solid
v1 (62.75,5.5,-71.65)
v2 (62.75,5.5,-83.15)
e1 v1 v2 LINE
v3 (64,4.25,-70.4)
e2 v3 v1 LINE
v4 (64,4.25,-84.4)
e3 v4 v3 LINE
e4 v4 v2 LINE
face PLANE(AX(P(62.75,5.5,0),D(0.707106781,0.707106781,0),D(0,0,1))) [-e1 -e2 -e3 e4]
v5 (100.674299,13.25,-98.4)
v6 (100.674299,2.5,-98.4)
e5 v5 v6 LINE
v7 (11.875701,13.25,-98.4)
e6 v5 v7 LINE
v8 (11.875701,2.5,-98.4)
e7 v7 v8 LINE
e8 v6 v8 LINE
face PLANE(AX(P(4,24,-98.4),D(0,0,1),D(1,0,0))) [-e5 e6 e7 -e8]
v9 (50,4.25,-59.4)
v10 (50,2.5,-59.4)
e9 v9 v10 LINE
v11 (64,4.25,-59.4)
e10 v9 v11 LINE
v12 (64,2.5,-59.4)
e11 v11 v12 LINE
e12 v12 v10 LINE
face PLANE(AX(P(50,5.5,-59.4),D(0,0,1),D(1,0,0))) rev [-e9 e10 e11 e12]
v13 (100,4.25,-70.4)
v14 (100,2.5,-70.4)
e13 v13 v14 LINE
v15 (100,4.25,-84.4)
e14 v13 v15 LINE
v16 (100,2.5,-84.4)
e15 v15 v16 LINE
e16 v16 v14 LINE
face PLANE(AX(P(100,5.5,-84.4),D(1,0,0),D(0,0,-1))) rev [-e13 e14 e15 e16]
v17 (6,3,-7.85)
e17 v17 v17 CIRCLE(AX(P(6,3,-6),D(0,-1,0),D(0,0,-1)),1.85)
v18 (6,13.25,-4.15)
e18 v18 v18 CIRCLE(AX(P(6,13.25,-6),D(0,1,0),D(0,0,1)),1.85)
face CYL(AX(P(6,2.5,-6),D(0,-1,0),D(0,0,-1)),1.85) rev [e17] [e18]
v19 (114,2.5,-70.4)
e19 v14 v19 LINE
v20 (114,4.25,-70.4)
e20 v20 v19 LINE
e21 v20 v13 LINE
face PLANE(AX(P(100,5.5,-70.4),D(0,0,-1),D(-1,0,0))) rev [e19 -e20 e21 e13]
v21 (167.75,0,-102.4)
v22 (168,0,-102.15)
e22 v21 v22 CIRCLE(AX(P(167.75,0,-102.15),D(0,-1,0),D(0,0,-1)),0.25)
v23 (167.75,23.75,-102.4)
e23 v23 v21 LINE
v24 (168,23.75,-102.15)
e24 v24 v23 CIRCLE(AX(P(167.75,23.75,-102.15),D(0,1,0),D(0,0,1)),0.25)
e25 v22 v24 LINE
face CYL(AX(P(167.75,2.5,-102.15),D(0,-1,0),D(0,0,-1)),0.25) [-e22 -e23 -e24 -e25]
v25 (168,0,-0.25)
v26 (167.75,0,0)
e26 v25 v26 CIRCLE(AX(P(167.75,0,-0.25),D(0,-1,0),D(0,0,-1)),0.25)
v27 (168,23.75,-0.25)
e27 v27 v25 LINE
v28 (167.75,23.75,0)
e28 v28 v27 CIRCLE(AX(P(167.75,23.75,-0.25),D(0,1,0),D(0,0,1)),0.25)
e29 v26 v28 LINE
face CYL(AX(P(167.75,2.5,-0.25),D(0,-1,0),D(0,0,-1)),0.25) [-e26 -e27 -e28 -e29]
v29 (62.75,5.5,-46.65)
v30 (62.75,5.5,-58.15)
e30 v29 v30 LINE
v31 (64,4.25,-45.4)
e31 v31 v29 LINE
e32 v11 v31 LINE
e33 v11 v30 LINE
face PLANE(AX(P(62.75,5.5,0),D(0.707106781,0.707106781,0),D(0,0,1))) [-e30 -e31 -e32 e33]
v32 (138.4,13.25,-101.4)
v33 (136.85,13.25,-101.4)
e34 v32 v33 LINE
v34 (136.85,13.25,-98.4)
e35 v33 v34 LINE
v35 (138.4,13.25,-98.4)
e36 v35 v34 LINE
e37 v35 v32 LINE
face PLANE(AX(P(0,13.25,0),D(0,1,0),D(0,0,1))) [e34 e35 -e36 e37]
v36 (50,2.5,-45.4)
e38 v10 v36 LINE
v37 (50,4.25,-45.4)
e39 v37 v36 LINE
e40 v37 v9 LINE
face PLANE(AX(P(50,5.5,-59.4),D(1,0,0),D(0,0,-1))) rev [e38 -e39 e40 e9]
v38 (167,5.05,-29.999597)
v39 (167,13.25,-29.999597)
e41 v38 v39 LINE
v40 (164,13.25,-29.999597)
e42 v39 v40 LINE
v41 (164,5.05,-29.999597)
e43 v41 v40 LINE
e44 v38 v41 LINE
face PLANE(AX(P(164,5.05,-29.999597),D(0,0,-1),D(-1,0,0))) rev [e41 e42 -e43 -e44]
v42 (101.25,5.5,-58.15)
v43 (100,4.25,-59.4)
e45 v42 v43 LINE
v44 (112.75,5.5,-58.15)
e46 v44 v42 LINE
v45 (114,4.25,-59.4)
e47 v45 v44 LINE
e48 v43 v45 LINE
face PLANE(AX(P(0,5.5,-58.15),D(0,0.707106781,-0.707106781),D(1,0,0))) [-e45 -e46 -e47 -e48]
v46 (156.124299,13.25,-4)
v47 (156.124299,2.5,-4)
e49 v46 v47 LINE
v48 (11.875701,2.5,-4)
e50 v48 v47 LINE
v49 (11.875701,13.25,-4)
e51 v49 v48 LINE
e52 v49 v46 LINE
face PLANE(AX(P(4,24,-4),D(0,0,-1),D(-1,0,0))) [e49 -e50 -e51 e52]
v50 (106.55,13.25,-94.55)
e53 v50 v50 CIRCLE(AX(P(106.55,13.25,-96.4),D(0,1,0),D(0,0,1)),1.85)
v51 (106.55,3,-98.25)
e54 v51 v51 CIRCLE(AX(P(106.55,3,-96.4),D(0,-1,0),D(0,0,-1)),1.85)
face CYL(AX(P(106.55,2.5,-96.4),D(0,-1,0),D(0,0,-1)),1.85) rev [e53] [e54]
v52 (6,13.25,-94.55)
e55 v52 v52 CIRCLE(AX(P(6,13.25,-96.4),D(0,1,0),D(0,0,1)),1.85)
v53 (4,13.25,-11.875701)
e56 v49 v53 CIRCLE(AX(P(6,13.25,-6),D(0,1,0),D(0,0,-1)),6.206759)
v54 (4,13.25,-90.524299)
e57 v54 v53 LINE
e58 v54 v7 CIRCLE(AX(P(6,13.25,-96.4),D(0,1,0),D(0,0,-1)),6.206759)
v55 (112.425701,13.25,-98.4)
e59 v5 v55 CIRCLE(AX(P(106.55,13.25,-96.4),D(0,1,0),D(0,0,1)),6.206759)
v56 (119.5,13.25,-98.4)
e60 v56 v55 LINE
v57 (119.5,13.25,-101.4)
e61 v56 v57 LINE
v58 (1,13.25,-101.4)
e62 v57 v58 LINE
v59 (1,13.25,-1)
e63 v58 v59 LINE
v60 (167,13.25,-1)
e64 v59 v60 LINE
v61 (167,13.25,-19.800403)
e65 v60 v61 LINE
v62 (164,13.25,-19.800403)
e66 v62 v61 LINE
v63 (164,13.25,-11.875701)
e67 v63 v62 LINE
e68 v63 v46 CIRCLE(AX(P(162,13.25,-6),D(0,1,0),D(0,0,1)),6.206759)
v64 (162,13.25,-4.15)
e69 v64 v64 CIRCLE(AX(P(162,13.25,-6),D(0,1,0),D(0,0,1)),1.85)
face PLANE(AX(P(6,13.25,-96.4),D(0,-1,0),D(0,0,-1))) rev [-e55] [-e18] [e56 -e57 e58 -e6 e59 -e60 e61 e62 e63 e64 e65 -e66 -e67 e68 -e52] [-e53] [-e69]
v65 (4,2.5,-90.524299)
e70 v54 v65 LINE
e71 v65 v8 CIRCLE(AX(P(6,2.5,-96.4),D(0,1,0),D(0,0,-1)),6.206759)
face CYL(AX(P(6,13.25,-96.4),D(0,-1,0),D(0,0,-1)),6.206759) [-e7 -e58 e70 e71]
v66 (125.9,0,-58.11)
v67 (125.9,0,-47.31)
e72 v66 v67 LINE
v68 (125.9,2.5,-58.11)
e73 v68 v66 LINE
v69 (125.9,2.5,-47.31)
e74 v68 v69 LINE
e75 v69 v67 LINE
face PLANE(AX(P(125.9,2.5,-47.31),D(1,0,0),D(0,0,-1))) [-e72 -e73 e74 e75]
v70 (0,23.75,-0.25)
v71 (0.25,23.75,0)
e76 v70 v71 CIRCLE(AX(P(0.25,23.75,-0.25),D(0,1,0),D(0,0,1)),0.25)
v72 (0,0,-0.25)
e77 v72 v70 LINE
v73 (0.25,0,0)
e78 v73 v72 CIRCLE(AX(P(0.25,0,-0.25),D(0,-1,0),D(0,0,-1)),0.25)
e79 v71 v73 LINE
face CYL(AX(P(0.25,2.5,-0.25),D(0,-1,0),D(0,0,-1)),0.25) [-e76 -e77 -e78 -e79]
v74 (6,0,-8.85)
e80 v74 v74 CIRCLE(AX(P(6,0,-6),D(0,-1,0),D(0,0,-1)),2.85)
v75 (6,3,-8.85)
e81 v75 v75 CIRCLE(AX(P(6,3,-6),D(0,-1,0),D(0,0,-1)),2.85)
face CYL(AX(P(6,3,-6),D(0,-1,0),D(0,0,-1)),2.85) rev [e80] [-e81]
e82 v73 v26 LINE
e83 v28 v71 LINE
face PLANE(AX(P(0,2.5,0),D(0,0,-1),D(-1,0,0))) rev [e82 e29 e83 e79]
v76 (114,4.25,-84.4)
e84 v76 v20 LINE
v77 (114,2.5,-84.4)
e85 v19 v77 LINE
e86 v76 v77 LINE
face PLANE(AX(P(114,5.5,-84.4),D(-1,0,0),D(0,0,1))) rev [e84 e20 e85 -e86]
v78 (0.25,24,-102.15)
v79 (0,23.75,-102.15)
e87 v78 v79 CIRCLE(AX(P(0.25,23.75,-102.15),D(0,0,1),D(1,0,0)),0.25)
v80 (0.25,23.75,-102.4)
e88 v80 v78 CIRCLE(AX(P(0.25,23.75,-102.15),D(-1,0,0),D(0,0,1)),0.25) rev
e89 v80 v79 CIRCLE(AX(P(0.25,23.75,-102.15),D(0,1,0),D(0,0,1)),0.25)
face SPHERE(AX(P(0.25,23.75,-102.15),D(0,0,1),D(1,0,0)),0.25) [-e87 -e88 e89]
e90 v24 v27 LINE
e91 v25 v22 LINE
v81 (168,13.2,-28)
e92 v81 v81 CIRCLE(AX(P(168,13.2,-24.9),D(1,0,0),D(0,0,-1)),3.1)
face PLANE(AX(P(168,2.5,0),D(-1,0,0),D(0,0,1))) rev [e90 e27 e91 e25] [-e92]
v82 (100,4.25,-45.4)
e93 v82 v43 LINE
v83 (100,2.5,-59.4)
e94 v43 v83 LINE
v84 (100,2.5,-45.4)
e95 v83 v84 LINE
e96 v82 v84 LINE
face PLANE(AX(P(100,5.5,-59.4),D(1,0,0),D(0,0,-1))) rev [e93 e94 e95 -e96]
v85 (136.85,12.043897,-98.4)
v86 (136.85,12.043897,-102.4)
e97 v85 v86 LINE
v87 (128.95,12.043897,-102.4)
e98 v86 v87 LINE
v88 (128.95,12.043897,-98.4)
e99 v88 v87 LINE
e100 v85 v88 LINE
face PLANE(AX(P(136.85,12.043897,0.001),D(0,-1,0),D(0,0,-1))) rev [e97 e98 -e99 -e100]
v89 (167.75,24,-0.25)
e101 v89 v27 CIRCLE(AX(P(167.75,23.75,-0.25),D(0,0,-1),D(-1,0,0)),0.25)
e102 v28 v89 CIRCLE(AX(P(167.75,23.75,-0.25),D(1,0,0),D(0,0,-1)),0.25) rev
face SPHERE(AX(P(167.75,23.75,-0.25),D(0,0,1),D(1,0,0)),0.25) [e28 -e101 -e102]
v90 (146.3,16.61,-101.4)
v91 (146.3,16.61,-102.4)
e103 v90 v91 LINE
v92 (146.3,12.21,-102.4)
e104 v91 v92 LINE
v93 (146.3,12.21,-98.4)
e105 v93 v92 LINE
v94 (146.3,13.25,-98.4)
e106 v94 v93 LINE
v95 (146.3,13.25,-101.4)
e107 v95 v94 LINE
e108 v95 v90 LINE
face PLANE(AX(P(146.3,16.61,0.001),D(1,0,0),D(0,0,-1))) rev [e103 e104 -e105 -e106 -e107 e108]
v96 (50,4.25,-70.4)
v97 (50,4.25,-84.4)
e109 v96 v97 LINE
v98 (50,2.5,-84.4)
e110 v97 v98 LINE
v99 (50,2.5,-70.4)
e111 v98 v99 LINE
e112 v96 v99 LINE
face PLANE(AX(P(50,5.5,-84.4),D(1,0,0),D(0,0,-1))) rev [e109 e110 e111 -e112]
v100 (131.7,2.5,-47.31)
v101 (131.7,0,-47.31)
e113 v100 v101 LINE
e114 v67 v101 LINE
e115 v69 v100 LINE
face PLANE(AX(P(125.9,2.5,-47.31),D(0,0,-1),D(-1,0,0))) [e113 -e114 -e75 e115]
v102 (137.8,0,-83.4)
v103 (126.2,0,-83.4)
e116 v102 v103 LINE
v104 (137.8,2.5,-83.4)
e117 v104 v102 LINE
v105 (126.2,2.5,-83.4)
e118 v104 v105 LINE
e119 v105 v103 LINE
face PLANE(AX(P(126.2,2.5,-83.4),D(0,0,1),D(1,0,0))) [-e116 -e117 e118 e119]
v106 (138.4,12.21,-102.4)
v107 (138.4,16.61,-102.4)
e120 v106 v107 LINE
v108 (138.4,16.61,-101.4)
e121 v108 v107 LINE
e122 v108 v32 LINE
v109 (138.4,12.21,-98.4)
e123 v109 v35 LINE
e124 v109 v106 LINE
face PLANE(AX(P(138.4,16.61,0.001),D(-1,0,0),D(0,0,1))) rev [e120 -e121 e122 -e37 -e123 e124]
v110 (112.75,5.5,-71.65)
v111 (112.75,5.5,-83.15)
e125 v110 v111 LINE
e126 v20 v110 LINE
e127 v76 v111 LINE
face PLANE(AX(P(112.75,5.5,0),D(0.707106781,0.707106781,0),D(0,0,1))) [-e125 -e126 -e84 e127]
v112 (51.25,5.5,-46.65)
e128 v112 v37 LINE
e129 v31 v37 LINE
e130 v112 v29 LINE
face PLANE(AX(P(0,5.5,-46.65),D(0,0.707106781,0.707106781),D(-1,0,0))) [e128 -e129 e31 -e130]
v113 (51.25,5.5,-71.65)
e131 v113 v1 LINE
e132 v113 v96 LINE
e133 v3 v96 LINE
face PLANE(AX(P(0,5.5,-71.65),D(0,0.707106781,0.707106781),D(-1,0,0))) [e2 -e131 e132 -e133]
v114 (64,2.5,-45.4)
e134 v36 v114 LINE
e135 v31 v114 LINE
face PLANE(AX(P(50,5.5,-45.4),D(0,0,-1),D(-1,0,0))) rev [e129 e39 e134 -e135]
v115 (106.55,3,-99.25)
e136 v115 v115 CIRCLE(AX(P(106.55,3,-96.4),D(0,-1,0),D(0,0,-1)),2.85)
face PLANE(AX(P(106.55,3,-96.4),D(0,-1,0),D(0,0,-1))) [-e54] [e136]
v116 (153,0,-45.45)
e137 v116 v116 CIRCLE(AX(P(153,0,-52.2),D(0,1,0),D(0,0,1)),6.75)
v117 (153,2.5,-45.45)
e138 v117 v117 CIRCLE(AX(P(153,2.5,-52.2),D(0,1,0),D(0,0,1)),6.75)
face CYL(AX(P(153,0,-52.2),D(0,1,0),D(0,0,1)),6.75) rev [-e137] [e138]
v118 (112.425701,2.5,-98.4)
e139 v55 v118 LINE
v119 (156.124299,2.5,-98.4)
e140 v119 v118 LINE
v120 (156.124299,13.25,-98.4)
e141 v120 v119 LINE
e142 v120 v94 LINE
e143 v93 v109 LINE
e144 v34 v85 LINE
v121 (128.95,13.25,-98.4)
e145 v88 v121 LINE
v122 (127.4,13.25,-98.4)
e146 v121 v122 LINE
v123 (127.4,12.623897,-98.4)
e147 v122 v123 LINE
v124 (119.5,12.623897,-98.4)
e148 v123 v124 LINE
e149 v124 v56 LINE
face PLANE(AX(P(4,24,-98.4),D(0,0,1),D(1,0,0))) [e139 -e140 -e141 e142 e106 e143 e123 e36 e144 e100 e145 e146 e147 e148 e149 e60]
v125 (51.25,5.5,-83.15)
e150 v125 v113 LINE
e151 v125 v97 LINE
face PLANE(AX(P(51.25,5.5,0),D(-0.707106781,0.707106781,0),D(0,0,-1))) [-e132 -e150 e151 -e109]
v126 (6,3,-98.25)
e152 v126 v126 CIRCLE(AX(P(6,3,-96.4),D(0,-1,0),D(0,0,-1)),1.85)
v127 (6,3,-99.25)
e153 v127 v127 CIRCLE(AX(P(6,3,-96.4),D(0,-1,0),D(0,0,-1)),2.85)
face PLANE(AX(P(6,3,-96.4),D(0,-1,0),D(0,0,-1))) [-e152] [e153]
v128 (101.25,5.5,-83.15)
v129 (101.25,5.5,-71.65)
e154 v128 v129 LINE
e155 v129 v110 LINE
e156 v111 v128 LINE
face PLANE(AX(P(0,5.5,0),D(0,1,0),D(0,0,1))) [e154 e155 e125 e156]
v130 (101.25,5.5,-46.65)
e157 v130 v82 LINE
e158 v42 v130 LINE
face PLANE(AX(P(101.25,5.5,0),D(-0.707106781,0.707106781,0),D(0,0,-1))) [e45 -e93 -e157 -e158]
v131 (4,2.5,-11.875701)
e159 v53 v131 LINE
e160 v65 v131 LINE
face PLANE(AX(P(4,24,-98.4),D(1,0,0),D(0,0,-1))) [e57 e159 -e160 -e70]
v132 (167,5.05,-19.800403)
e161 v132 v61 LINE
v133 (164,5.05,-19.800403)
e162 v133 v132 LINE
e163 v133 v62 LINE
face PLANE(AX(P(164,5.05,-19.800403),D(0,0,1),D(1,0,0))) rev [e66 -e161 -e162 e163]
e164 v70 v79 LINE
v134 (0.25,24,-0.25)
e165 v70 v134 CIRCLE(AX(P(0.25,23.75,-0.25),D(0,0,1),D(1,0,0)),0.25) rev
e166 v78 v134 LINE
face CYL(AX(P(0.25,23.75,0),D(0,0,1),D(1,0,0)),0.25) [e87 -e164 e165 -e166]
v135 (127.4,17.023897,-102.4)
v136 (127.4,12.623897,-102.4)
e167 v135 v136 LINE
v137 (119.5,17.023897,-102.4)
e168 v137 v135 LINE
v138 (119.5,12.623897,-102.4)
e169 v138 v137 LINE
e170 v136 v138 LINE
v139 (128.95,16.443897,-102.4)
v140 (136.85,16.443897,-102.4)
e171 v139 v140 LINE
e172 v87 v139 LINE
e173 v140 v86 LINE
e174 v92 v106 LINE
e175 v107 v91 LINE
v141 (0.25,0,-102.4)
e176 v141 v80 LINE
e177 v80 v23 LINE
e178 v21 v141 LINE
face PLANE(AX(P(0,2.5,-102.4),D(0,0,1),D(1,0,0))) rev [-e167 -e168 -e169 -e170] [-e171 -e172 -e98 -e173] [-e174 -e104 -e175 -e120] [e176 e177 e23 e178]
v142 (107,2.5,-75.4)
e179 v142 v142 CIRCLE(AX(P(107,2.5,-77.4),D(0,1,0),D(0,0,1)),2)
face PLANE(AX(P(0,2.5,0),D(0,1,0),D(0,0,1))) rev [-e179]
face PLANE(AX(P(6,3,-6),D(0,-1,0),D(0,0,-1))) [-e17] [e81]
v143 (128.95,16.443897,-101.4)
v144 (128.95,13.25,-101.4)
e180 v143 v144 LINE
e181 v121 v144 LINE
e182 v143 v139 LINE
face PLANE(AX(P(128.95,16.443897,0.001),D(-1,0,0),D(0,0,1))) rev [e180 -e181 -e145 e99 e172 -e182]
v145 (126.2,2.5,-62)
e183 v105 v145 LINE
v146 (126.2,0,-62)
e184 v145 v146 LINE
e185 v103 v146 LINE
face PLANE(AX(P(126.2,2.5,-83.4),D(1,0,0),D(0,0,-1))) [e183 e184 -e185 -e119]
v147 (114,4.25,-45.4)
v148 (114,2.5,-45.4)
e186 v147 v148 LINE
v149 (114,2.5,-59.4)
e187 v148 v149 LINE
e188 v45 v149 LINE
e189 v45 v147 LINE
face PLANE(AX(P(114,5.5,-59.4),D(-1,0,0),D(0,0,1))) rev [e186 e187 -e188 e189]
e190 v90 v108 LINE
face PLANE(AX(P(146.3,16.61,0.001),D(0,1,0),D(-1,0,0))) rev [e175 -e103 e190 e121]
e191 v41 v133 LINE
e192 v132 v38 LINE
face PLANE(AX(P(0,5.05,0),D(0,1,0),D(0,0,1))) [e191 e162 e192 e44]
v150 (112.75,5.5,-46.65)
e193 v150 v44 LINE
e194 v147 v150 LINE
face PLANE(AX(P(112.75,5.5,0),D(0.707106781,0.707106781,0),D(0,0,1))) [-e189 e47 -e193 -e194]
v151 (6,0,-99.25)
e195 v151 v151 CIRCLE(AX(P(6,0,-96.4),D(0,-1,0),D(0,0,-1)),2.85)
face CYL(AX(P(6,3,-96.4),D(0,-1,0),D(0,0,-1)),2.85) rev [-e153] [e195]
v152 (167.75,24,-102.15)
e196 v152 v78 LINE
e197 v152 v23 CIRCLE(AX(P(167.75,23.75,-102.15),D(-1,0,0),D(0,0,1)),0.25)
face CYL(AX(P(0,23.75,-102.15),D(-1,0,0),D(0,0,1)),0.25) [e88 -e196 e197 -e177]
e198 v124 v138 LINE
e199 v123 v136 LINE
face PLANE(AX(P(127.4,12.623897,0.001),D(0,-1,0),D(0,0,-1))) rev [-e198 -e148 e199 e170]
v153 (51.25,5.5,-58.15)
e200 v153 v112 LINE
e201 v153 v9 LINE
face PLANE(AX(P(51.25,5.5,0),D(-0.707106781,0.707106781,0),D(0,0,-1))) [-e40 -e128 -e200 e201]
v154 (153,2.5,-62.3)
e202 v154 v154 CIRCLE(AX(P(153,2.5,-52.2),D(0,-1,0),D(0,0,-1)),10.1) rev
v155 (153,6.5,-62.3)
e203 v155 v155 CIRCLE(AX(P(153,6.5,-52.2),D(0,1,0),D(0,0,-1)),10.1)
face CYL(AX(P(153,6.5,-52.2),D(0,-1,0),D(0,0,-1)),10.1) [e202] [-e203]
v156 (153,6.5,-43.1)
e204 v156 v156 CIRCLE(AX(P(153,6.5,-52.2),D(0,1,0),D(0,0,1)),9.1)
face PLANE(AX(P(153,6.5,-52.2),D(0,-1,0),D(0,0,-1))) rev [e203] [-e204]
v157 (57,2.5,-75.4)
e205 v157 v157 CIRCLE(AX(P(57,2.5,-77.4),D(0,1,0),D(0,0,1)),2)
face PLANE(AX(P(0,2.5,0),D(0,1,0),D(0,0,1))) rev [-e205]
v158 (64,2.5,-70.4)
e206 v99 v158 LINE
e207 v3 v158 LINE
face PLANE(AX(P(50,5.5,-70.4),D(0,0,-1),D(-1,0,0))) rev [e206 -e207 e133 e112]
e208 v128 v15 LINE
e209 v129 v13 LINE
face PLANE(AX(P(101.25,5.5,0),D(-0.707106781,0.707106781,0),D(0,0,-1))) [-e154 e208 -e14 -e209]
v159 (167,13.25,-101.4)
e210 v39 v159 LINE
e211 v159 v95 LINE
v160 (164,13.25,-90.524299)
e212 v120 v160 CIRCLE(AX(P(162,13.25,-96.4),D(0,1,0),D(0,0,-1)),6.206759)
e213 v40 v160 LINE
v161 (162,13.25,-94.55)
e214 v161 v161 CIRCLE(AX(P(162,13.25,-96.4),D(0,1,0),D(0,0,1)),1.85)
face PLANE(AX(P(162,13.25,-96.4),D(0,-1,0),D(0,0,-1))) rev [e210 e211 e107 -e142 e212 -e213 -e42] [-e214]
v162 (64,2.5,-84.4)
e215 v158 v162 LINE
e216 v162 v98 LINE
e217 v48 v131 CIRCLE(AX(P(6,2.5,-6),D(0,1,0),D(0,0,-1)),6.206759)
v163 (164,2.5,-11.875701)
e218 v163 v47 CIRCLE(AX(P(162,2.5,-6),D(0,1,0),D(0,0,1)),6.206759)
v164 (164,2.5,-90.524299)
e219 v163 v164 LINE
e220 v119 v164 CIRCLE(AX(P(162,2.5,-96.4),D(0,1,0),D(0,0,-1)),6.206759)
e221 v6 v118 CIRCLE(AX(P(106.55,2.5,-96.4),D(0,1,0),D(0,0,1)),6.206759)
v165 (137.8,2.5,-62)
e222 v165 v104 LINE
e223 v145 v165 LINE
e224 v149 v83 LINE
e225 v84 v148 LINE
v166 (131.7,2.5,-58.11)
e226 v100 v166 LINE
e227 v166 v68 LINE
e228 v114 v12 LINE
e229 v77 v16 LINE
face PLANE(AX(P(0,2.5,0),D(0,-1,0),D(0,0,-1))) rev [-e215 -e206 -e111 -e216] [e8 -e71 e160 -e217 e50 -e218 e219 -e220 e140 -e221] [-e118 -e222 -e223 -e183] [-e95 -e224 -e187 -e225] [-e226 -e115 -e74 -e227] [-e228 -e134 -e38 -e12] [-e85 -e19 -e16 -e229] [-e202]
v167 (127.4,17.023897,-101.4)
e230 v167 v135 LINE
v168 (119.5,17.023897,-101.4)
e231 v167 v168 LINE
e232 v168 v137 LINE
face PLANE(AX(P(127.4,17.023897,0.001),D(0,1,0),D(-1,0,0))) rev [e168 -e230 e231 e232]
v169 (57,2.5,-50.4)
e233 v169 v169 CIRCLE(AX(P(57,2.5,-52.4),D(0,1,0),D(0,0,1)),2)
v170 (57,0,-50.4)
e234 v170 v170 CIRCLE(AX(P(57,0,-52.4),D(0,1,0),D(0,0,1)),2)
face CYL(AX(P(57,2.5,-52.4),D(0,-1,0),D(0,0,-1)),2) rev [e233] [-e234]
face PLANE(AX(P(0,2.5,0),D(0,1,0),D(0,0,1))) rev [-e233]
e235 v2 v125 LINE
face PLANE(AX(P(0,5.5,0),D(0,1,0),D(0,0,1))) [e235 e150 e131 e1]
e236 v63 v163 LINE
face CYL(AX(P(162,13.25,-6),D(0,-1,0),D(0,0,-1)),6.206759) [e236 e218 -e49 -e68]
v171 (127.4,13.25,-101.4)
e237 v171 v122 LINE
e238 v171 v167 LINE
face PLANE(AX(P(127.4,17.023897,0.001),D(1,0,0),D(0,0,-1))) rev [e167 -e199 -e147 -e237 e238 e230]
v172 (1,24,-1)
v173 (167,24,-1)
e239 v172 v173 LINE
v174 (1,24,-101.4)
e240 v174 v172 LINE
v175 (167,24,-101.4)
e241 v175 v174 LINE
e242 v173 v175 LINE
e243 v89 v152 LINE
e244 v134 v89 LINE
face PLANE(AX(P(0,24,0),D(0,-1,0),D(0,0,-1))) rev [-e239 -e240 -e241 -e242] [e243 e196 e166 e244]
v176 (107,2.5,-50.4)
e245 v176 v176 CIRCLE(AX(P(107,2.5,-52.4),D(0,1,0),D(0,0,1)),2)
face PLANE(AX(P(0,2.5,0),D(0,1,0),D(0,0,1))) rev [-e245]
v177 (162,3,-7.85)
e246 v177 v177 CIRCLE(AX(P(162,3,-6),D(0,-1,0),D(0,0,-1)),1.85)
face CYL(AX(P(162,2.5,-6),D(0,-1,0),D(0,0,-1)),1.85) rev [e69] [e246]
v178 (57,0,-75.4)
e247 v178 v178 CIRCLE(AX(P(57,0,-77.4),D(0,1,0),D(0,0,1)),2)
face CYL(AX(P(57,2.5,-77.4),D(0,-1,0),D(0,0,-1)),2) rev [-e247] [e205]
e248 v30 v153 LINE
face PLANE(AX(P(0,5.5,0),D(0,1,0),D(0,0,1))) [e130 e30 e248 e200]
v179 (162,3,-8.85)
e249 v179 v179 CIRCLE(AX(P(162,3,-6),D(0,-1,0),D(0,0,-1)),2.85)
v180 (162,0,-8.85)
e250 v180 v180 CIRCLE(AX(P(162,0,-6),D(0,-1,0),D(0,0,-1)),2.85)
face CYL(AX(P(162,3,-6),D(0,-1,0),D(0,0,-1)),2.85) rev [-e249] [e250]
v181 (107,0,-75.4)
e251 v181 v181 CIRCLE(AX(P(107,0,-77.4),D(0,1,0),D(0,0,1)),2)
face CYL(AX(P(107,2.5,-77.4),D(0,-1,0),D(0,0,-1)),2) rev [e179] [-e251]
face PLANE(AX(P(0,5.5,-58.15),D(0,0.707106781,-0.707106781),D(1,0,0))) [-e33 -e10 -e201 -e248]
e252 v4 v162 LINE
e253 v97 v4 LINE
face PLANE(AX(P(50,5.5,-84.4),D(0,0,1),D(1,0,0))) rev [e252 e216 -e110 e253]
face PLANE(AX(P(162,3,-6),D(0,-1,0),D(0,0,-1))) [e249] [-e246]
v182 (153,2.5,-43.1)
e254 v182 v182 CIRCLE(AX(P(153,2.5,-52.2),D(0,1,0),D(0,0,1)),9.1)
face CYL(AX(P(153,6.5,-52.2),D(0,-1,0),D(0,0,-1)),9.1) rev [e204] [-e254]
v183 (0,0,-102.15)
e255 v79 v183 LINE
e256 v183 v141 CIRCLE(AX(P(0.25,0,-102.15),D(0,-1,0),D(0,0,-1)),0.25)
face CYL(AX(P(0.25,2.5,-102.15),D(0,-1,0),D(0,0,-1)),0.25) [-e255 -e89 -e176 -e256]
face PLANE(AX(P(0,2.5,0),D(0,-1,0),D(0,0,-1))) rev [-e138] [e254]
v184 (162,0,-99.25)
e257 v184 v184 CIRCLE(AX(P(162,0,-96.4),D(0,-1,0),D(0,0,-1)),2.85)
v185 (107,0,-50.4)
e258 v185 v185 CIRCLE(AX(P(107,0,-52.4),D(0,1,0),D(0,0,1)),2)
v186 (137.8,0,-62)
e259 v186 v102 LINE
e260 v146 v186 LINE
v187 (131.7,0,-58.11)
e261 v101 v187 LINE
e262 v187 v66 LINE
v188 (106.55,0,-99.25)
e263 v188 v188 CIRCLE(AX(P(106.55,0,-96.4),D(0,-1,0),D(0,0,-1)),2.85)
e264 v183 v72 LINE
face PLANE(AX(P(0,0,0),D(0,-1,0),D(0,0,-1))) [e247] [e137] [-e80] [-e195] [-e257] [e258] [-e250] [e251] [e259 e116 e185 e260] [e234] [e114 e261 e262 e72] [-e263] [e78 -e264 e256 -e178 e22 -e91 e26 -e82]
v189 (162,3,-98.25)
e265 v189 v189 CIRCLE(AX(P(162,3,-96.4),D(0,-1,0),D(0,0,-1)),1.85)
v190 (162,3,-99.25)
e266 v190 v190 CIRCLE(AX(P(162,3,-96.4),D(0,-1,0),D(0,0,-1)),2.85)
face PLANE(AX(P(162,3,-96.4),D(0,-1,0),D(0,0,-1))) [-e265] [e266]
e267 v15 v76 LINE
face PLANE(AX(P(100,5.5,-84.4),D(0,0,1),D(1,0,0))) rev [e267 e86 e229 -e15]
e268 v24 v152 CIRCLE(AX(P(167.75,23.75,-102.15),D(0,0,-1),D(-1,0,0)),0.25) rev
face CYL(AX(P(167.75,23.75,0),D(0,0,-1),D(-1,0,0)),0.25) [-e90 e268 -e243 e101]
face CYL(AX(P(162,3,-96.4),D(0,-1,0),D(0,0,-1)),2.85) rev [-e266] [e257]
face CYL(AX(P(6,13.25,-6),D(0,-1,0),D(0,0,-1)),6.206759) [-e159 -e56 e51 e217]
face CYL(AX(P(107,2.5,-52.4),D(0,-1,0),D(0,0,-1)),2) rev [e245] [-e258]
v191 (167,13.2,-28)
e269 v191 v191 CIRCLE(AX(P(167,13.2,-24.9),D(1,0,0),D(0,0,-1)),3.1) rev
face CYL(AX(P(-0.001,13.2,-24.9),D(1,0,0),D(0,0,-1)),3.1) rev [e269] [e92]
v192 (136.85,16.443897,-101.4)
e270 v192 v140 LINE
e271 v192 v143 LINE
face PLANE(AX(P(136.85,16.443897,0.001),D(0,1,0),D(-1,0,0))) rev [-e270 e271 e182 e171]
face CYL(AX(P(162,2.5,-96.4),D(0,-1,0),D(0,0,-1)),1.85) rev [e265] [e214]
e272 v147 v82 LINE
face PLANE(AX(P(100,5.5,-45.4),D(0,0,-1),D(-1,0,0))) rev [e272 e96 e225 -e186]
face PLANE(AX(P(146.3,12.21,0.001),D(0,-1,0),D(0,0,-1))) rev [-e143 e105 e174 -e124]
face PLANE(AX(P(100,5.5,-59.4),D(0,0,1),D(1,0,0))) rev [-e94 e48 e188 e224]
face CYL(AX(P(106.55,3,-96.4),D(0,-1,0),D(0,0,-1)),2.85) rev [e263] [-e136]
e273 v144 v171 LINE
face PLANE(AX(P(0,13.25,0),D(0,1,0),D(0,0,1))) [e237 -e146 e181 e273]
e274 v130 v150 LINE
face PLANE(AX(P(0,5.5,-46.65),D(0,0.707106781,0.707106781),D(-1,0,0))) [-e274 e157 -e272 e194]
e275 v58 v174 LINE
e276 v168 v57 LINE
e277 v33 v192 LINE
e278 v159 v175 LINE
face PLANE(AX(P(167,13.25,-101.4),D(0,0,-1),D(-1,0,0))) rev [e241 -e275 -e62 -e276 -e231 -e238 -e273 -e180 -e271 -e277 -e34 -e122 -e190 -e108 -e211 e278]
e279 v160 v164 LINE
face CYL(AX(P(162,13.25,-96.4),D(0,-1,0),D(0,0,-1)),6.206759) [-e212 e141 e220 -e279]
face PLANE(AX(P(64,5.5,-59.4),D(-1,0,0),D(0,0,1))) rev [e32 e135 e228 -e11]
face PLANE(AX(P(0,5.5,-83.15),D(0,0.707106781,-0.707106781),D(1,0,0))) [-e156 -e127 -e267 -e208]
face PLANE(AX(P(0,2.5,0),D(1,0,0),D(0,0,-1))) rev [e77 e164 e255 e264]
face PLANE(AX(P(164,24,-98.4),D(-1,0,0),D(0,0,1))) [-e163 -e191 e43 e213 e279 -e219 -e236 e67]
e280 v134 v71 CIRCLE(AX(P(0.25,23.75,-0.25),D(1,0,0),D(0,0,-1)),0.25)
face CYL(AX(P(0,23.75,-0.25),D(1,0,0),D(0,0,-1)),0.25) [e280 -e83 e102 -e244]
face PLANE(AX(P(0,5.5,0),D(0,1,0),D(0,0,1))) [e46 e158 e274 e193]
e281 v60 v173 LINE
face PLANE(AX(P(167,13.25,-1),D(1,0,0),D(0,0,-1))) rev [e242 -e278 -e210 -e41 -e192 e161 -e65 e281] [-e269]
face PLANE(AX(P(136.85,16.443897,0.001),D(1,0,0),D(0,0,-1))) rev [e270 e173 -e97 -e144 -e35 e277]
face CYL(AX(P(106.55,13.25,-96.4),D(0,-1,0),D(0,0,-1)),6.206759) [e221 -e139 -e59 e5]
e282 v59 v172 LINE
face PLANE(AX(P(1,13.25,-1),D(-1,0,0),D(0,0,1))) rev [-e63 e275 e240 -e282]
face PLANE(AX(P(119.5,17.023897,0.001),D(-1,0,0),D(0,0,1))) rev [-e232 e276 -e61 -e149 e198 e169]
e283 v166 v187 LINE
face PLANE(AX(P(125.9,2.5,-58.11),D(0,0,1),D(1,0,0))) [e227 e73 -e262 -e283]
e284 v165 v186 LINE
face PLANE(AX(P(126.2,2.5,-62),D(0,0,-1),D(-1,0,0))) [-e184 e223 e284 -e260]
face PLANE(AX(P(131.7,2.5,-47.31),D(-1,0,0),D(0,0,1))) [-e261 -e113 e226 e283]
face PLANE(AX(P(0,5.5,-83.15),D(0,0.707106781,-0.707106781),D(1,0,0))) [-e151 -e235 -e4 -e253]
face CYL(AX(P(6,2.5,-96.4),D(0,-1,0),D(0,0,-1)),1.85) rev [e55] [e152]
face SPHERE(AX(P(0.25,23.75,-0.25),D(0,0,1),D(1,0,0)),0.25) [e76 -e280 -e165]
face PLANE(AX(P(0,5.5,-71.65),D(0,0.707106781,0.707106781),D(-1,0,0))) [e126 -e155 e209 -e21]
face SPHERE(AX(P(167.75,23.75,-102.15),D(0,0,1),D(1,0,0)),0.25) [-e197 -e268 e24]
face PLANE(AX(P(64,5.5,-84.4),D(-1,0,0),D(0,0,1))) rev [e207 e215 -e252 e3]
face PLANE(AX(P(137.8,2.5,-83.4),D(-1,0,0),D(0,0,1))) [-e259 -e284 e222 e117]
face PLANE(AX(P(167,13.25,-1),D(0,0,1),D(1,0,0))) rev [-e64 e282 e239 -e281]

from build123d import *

# Parameters (mm, degrees)
BASESKETCH1_W                               = 168
BASESKETCH1_H                               = 102.4
BASESKETCH1_R                               = 2
BASESKETCH1_R_2                             = 1.85
BASESKETCH1_W_2                             = 11.6
BASESKETCH1_H_2                             = 21.4
BASESKETCH1_W_3                             = 5.8
BASESKETCH1_H_3                             = 10.8
BASEBOSS_EXTRUDE1_DEPTH                     = 2.5
SKETCH2_W                                   = 168
SKETCH2_H                                   = 102.4
SKETCH2_W_2                                 = 160
SKETCH2_H_2                                 = 94.4
WALLBOSS_EXTRUDE2_DEPTH                     = 21.5
SKETCH3_W                                   = 14
SKETCH3_H                                   = 14
MOUNTHOLEBOSS_EXTRUDE3_DEPTH                = 3
MOUNTHOLEBOSSCHAMFER3_SIZE                  = 1.25
HDMI7MOUNTHOLESSKETCH8_R                    = 1.85
HDMI7MOUNTHOLESBOSS_EXTRUDE4_DEPTH          = 10.75
DISPLAYBUTTONSCUT_EXTRUDE1_REACH            = 200.206
DISPLAYBUTTONSSKETCH9_W                     = 7.9
DISPLAYBUTTONSSKETCH9_H                     = 4.4
AUDIOCONNECTORCUT_EXTRUDE2_REACH            = 200.206
AUDIOCONNECTORSKETCH10_R                    = 3.1
M3BORESKETCH11_R                            = 2.85
M3BORECUT_EXTRUDE3_DEPTH                    = 3
UPPERTHINWALLSKETCH4_W                      = 166
UPPERTHINWALLSKETCH4_H                      = 100.4
UPPERTHINWALLSKETCH4_W_2                    = 160
UPPERTHINWALLSKETCH4_H_2                    = 94.4
UPPERTHINWALLCUT_EXTRUDE1_DEPTH             = 10.75
HDMI7AUDIOCONNECTORKNOTCHSKETCH5_W          = 3
HDMI7AUDIOCONNECTORKNOTCHSKETCH5_H          = 10.199193496
HDMI7AUDIOCONNECTORKNOTCHCUT_EXTRUDE2_DEPTH = 8.2
TOPFILLET1_R                                = 0.25
CORNERFILLET2_R                             = 0.25
SPEAKERHOLESKETCH4_R                        = 6.75
SPEAERHOLECUT_EXTRUDE1_DEPTH                = 198.919200686
SPEAKERHOLDERSKETCH5_R                      = 10.1
SPEAKERHOLDERSKETCH5_R_2                    = 9.1
SPEAKERHOLDERBOSS_EXTRUDE1_DEPTH            = 4


with BuildPart() as part:
    # BaseSketch1 → BaseBoss-Extrude1 (new body)
    with BuildSketch(Plane(origin=(0, 0, 0), x_dir=(1, 0, 0), z_dir=(0, 1, 0))):
        with Locations((84, 51.2)):
            Rectangle(BASESKETCH1_W, BASESKETCH1_H)
        with Locations(Location((57, 77.4, 0), (0, 0, 270))):
            Circle(BASESKETCH1_R, mode=Mode.SUBTRACT)
        with Locations(Location((107, 77.4, 0), (0, 0, 270))):
            Circle(BASESKETCH1_R, mode=Mode.SUBTRACT)
        with Locations(Location((57, 52.4, 0), (0, 0, 270))):
            Circle(BASESKETCH1_R, mode=Mode.SUBTRACT)
        with Locations(Location((107, 52.4, 0), (0, 0, 270))):
            Circle(BASESKETCH1_R, mode=Mode.SUBTRACT)
        with Locations(Location((6, 96.4, 0), (0, 0, 270))):
            Circle(BASESKETCH1_R_2, mode=Mode.SUBTRACT)
        with Locations(Location((6, 6, 0), (0, 0, 270))):
            Circle(BASESKETCH1_R_2, mode=Mode.SUBTRACT)
        with Locations(Location((162, 6, 0), (0, 0, 270))):
            Circle(BASESKETCH1_R_2, mode=Mode.SUBTRACT)
        with Locations(Location((162, 96.4, 0), (0, 0, 270))):
            Circle(BASESKETCH1_R_2, mode=Mode.SUBTRACT)
        with Locations(Location((106.55, 96.4, 0), (0, 0, 270))):
            Circle(BASESKETCH1_R_2, mode=Mode.SUBTRACT)
        with Locations((132, 72.7)):
            Rectangle(BASESKETCH1_W_2, BASESKETCH1_H_2, mode=Mode.SUBTRACT)
        with Locations((128.8, 52.71)):
            Rectangle(BASESKETCH1_W_3, BASESKETCH1_H_3, mode=Mode.SUBTRACT)
    extrude(amount=BASEBOSS_EXTRUDE1_DEPTH)

    # Sketch2 → WallBoss-Extrude2 (add)
    with BuildSketch(Plane(origin=(0, 2.5, 0), x_dir=(1, 0, 0), z_dir=(0, 1, 0))):
        with Locations((84, 51.2)):
            Rectangle(SKETCH2_W, SKETCH2_H)
        with Locations((84, 51.2)):
            Rectangle(SKETCH2_W_2, SKETCH2_H_2, mode=Mode.SUBTRACT)
    extrude(amount=WALLBOSS_EXTRUDE2_DEPTH)

    # Sketch3 → MountHoleBoss-Extrude3 (add)
    with BuildSketch(Plane(origin=(0, 2.5, 0), x_dir=(1, 0, 0), z_dir=(0, 1, 0))):
        with Locations((57, 77.4)):
            Rectangle(SKETCH3_W, SKETCH3_H)
        with Locations((57, 52.4)):
            Rectangle(SKETCH3_W, SKETCH3_H)
        with Locations((107, 77.4)):
            Rectangle(SKETCH3_W, SKETCH3_H)
        with Locations((107, 52.4)):
            Rectangle(SKETCH3_W, SKETCH3_H)
    extrude(amount=MOUNTHOLEBOSS_EXTRUDE3_DEPTH)

    # MountHoleBossChamfer3
    mountholebosschamfer3_edges = [part.edges().sort_by_distance(p)[0] for p in [
        (64, 5.5, -77.4),
        (57, 5.5, -84.4),
        (50, 5.5, -77.4),
        (57, 5.5, -70.4),
        (64, 5.5, -52.4),
        (57, 5.5, -59.4),
        (50, 5.5, -52.4),
        (57, 5.5, -45.4),
        (114, 5.5, -77.4),
        (107, 5.5, -84.4),
        (100, 5.5, -77.4),
        (107, 5.5, -70.4),
        (114, 5.5, -52.4),
        (107, 5.5, -59.4),
        (100, 5.5, -52.4),
        (107, 5.5, -45.4),
    ]]
    chamfer(mountholebosschamfer3_edges, length=MOUNTHOLEBOSSCHAMFER3_SIZE)

    # HDMI7MountHolesSketch8 → HDMI7MountHolesBoss-Extrude4 (add)
    # profile 1 of 5: a face of its own
    with BuildSketch(Plane(origin=(0, 2.5, 0), x_dir=(1, 0, 0), z_dir=(0, 1, 0))):
        with BuildLine():
            Line((4, 90.524299493), (4, 98.4))
            Line((4, 98.4), (11.875700507, 98.4))
            ThreePointArc((11.875700507, 98.4), (10.388841331, 92.011158669), (4, 90.524299493))
        make_face()
        with Locations(Location((6, 96.4, 0), (0, 0, 270))):
            Circle(HDMI7MOUNTHOLESSKETCH8_R, mode=Mode.SUBTRACT)
    # profile 2 of 5: a face of its own
    with BuildSketch(Plane(origin=(0, 2.5, 0), x_dir=(1, 0, 0), z_dir=(0, 1, 0))):
        with BuildLine():
            Line((156.124299493, 98.4), (164, 98.4))
            Line((164, 98.4), (164, 90.524299493))
            ThreePointArc((164, 90.524299493), (157.611158669, 92.011158669), (156.124299493, 98.4))
        make_face()
        with Locations(Location((162, 96.4, 0), (0, 0, 270))):
            Circle(HDMI7MOUNTHOLESSKETCH8_R, mode=Mode.SUBTRACT)
    # profile 3 of 5: a face of its own
    with BuildSketch(Plane(origin=(0, 2.5, 0), x_dir=(1, 0, 0), z_dir=(0, 1, 0))):
        with BuildLine():
            Line((156.124299493, 4), (164, 4))
            Line((164, 4), (164, 11.875700507))
            ThreePointArc((164, 11.875700507), (157.611158669, 10.388841331), (156.124299493, 4))
        make_face()
        with Locations(Location((162, 6, 0), (0, 0, 270))):
            Circle(HDMI7MOUNTHOLESSKETCH8_R, mode=Mode.SUBTRACT)
    # profile 4 of 5: a face of its own
    with BuildSketch(Plane(origin=(0, 2.5, 0), x_dir=(1, 0, 0), z_dir=(0, 1, 0))):
        with BuildLine():
            Line((11.875700507, 4), (4, 4))
            Line((4, 4), (4, 11.875700507))
            ThreePointArc((4, 11.875700507), (10.388841331, 10.388841331), (11.875700507, 4))
        make_face()
        with Locations(Location((6, 6, 0), (0, 0, 270))):
            Circle(HDMI7MOUNTHOLESSKETCH8_R, mode=Mode.SUBTRACT)
    # profile 5 of 5: a face of its own
    with BuildSketch(Plane(origin=(0, 2.5, 0), x_dir=(1, 0, 0), z_dir=(0, 1, 0))):
        with BuildLine():
            Line((100.674299493, 98.4), (112.425700507, 98.4))
            ThreePointArc((112.425700507, 98.4), (106.55, 90.193241067), (100.674299493, 98.4))
        make_face()
        with Locations(Location((106.55, 96.4, 0), (0, 0, 270))):
            Circle(HDMI7MOUNTHOLESSKETCH8_R, mode=Mode.SUBTRACT)
    extrude(amount=HDMI7MOUNTHOLESBOSS_EXTRUDE4_DEPTH)

    # DisplayButtonsSketch9 → DisplayButtonsCut-Extrude1 (cut, up to next)
    with BuildSketch(Plane(origin=(0, 0, -102.4), x_dir=(-1, 0, 0), z_dir=(0, 0, -1)), mode=Mode.PRIVATE) as displaybuttonscut_extrude1_sk1:
        with Locations((-142.35, 14.41)):
            Rectangle(DISPLAYBUTTONSSKETCH9_W, DISPLAYBUTTONSSKETCH9_H)
    displaybuttonscut_extrude1_tool1 = extrude(displaybuttonscut_extrude1_sk1.sketch, amount=-DISPLAYBUTTONSCUT_EXTRUDE1_REACH, mode=Mode.PRIVATE) & part.part
    # DisplayButtonsSketch9 → DisplayButtonsCut-Extrude1 (cut, up to next)
    with BuildSketch(Plane(origin=(0, 0, -102.4), x_dir=(-1, 0, 0), z_dir=(0, 0, -1)), mode=Mode.PRIVATE) as displaybuttonscut_extrude1_sk2:
        with Locations((-132.9, 14.243897474)):
            Rectangle(DISPLAYBUTTONSSKETCH9_W, DISPLAYBUTTONSSKETCH9_H)
    displaybuttonscut_extrude1_tool2 = extrude(displaybuttonscut_extrude1_sk2.sketch, amount=-DISPLAYBUTTONSCUT_EXTRUDE1_REACH, mode=Mode.PRIVATE) & part.part
    # DisplayButtonsSketch9 → DisplayButtonsCut-Extrude1 (cut, up to next)
    with BuildSketch(Plane(origin=(0, 0, -102.4), x_dir=(-1, 0, 0), z_dir=(0, 0, -1)), mode=Mode.PRIVATE) as displaybuttonscut_extrude1_sk3:
        with Locations((-123.45, 14.823897474)):
            Rectangle(DISPLAYBUTTONSSKETCH9_W, DISPLAYBUTTONSSKETCH9_H)
    displaybuttonscut_extrude1_tool3 = extrude(displaybuttonscut_extrude1_sk3.sketch, amount=-DISPLAYBUTTONSCUT_EXTRUDE1_REACH, mode=Mode.PRIVATE) & part.part
    add(displaybuttonscut_extrude1_tool1.solids().sort_by_distance((142.35, 14.41, -102.4))[0], mode=Mode.SUBTRACT)
    add(displaybuttonscut_extrude1_tool2.solids().sort_by_distance((132.9, 14.243897, -102.4))[0], mode=Mode.SUBTRACT)
    add(displaybuttonscut_extrude1_tool3.solids().sort_by_distance((123.45, 14.823897, -102.4))[0], mode=Mode.SUBTRACT)

    # AudioConnectorSketch10 → AudioConnectorCut-Extrude2 (cut, up to next)
    with BuildSketch(Plane(origin=(168, 0, 0), x_dir=(0, 0, -1), z_dir=(1, 0, 0)), mode=Mode.PRIVATE) as audioconnectorcut_extrude2_sk1:
        with Locations((24.9, 13.2)):
            Circle(AUDIOCONNECTORSKETCH10_R)
    audioconnectorcut_extrude2_tool1 = extrude(audioconnectorcut_extrude2_sk1.sketch, amount=-AUDIOCONNECTORCUT_EXTRUDE2_REACH, mode=Mode.PRIVATE) & part.part
    add(audioconnectorcut_extrude2_tool1.solids().sort_by_distance((168, 13.2, -24.9))[0], mode=Mode.SUBTRACT)

    # M3BoreSketch11 → M3BoreCut-Extrude3 (cut)
    with BuildSketch(Plane.XZ):
        with Locations(Location((6, -6, 0), (0, 0, 270))):
            Circle(M3BORESKETCH11_R)
        with Locations(Location((162, -6, 0), (0, 0, 270))):
            Circle(M3BORESKETCH11_R)
        with Locations(Location((162, -96.4, 0), (0, 0, 270))):
            Circle(M3BORESKETCH11_R)
        with Locations(Location((6, -96.4, 0), (0, 0, 270))):
            Circle(M3BORESKETCH11_R)
        with Locations(Location((106.55, -96.4, 0), (0, 0, 270))):
            Circle(M3BORESKETCH11_R)
    extrude(amount=-M3BORECUT_EXTRUDE3_DEPTH, mode=Mode.SUBTRACT)

    # UpperThinWallSketch4 → UpperThinWallCut-Extrude1 (cut)
    with BuildSketch(Plane(origin=(0, 24, 0), x_dir=(1, 0, 0), z_dir=(0, 1, 0))):
        with Locations((84, 51.2)):
            Rectangle(UPPERTHINWALLSKETCH4_W, UPPERTHINWALLSKETCH4_H)
        with Locations((84, 51.2)):
            Rectangle(UPPERTHINWALLSKETCH4_W_2, UPPERTHINWALLSKETCH4_H_2, mode=Mode.SUBTRACT)
    extrude(amount=-UPPERTHINWALLCUT_EXTRUDE1_DEPTH, mode=Mode.SUBTRACT)

    # HDMI7AudioConnectorKnotchSketch5 → HDMI7AudioConnectorKnotchCut-Extrude2 (cut)
    with BuildSketch(Plane(origin=(0, 13.25, 0), x_dir=(1, 0, 0), z_dir=(0, 1, 0))):
        with Locations((165.5, 24.9)):
            Rectangle(HDMI7AUDIOCONNECTORKNOTCHSKETCH5_W, HDMI7AUDIOCONNECTORKNOTCHSKETCH5_H)
    extrude(amount=-HDMI7AUDIOCONNECTORKNOTCHCUT_EXTRUDE2_DEPTH, mode=Mode.SUBTRACT)

    # TopFillet1
    topfillet1_edges = [part.edges().sort_by_distance(p)[0] for p in [
        (0, 24, -51.2),
        (84, 24, 0),
        (168, 24, -51.2),
        (84, 24, -102.4),
    ]]
    fillet(topfillet1_edges, radius=TOPFILLET1_R)

    # CornerFillet2
    # the kernel refuses this fillet: 0.25 mm, written as the material it takes off along each edge
    with BuildSketch(Plane(origin=(0.25, 23.75, -0.25), x_dir=(0, 0, 1), z_dir=(-1, 0, 0))) as cornerfillet2_piece_1_section:
        Polygon((0, 0), (CORNERFILLET2_R, 0), (CORNERFILLET2_R, CORNERFILLET2_R), (0, CORNERFILLET2_R), align=None)
    cornerfillet2_piece_1 = extrude(amount=CORNERFILLET2_R, mode=Mode.PRIVATE)
    cornerfillet2_piece_1 = cornerfillet2_piece_1 - Plane(origin=(0.25, 23.75, -0.25), x_dir=(0, -0.7071067811865475, -0.7071067811865475), z_dir=(-1, 0, 0)) * Sphere(CORNERFILLET2_R, mode=Mode.PRIVATE)
    add(cornerfillet2_piece_1, mode=Mode.SUBTRACT)
    with BuildSketch(Plane(origin=(0.25, 23.75, -102.15), x_dir=(0, 0, -1), z_dir=(-1, 0, 0))) as cornerfillet2_piece_2_section:
        Polygon((0, 0), (CORNERFILLET2_R, 0), (CORNERFILLET2_R, -CORNERFILLET2_R), (0, -CORNERFILLET2_R), align=None)
    cornerfillet2_piece_2 = extrude(amount=CORNERFILLET2_R, mode=Mode.PRIVATE)
    cornerfillet2_piece_2 = cornerfillet2_piece_2 - Plane(origin=(0.25, 23.75, -102.15), x_dir=(0, -0.7071067811865475, 0.7071067811865475), z_dir=(-1, 0, 0)) * Sphere(CORNERFILLET2_R, mode=Mode.PRIVATE)
    add(cornerfillet2_piece_2, mode=Mode.SUBTRACT)
    with BuildSketch(Plane(origin=(167.75, 23.75, -0.25), x_dir=(1, 0, 0), z_dir=(0, 0, 1))) as cornerfillet2_piece_3_section:
        Polygon((0, 0), (CORNERFILLET2_R, 0), (CORNERFILLET2_R, CORNERFILLET2_R), (0, CORNERFILLET2_R), align=None)
    cornerfillet2_piece_3 = extrude(amount=CORNERFILLET2_R, mode=Mode.PRIVATE)
    cornerfillet2_piece_3 = cornerfillet2_piece_3 - Plane(origin=(167.75, 23.75, -0.25), x_dir=(-0.7071067811865475, -0.7071067811865475, 0), z_dir=(0, 0, 1)) * Sphere(CORNERFILLET2_R, mode=Mode.PRIVATE)
    add(cornerfillet2_piece_3, mode=Mode.SUBTRACT)
    with BuildSketch(Plane(origin=(167.75, 23.75, -102.15), x_dir=(1, 0, 0), z_dir=(0, 0, -1))) as cornerfillet2_piece_4_section:
        Polygon((0, 0), (CORNERFILLET2_R, 0), (CORNERFILLET2_R, -CORNERFILLET2_R), (0, -CORNERFILLET2_R), align=None)
    cornerfillet2_piece_4 = extrude(amount=CORNERFILLET2_R, mode=Mode.PRIVATE)
    cornerfillet2_piece_4 = cornerfillet2_piece_4 - Plane(origin=(167.75, 23.75, -102.15), x_dir=(-0.7071067811865475, -0.7071067811865475, 0), z_dir=(0, 0, -1)) * Sphere(CORNERFILLET2_R, mode=Mode.PRIVATE)
    add(cornerfillet2_piece_4, mode=Mode.SUBTRACT)
    with BuildSketch(Plane(origin=(168, -0.625, -102.4), x_dir=(-1, 0, 0), z_dir=(0, 1, 0)), Plane(origin=(0, 23.75, 0), x_dir=(0, 0, -1), z_dir=(0, -1, 0))) as cornerfillet2_piece_5:
        with BuildLine():
            CenterArc((CORNERFILLET2_R, CORNERFILLET2_R), CORNERFILLET2_R, 180, 90)
            Line((0, CORNERFILLET2_R), (0, 0))
            Line((0, 0), (CORNERFILLET2_R, 0))
        make_face()
    extrude(amount=24.375, mode=Mode.SUBTRACT)
    with BuildSketch(Plane(origin=(168, -0.625, 0), x_dir=(-1, 0, 0), z_dir=(0, 1, 0)), Plane(origin=(0, 23.75, -102.4), x_dir=(0, 0, 1), z_dir=(0, -1, 0))) as cornerfillet2_piece_6:
        with BuildLine():
            CenterArc((CORNERFILLET2_R, -CORNERFILLET2_R), CORNERFILLET2_R, 90, 90)
            Line((0, -CORNERFILLET2_R), (0, 0))
            Line((0, 0), (CORNERFILLET2_R, 0))
        make_face()
    extrude(amount=24.375, mode=Mode.SUBTRACT)

    # SpeakerHoleSketch4 → SpeaerHoleCut-Extrude1 (cut, through all)
    with BuildSketch(Plane(origin=(0, 2.5, 0), x_dir=(1, 0, 0), z_dir=(0, 1, 0))):
        with Locations(Location((153, 52.2, 0), (0, 0, 270))):
            Circle(SPEAKERHOLESKETCH4_R)
    extrude(amount=-SPEAERHOLECUT_EXTRUDE1_DEPTH, mode=Mode.SUBTRACT)

    # SpeakerHolderSketch5 → SpeakerHolderBoss-Extrude1 (add)
    with BuildSketch(Plane(origin=(0, 2.5, 0), x_dir=(1, 0, 0), z_dir=(0, 1, 0))):
        with Locations(Location((153, 52.2, 0), (0, 0, 90))):
            Circle(SPEAKERHOLDERSKETCH5_R)
        with Locations(Location((153, 52.2, 0), (0, 0, 270))):
            Circle(SPEAKERHOLDERSKETCH5_R_2, mode=Mode.SUBTRACT)
    extrude(amount=SPEAKERHOLDERBOSS_EXTRUDE1_DEPTH)


solid = part.part
